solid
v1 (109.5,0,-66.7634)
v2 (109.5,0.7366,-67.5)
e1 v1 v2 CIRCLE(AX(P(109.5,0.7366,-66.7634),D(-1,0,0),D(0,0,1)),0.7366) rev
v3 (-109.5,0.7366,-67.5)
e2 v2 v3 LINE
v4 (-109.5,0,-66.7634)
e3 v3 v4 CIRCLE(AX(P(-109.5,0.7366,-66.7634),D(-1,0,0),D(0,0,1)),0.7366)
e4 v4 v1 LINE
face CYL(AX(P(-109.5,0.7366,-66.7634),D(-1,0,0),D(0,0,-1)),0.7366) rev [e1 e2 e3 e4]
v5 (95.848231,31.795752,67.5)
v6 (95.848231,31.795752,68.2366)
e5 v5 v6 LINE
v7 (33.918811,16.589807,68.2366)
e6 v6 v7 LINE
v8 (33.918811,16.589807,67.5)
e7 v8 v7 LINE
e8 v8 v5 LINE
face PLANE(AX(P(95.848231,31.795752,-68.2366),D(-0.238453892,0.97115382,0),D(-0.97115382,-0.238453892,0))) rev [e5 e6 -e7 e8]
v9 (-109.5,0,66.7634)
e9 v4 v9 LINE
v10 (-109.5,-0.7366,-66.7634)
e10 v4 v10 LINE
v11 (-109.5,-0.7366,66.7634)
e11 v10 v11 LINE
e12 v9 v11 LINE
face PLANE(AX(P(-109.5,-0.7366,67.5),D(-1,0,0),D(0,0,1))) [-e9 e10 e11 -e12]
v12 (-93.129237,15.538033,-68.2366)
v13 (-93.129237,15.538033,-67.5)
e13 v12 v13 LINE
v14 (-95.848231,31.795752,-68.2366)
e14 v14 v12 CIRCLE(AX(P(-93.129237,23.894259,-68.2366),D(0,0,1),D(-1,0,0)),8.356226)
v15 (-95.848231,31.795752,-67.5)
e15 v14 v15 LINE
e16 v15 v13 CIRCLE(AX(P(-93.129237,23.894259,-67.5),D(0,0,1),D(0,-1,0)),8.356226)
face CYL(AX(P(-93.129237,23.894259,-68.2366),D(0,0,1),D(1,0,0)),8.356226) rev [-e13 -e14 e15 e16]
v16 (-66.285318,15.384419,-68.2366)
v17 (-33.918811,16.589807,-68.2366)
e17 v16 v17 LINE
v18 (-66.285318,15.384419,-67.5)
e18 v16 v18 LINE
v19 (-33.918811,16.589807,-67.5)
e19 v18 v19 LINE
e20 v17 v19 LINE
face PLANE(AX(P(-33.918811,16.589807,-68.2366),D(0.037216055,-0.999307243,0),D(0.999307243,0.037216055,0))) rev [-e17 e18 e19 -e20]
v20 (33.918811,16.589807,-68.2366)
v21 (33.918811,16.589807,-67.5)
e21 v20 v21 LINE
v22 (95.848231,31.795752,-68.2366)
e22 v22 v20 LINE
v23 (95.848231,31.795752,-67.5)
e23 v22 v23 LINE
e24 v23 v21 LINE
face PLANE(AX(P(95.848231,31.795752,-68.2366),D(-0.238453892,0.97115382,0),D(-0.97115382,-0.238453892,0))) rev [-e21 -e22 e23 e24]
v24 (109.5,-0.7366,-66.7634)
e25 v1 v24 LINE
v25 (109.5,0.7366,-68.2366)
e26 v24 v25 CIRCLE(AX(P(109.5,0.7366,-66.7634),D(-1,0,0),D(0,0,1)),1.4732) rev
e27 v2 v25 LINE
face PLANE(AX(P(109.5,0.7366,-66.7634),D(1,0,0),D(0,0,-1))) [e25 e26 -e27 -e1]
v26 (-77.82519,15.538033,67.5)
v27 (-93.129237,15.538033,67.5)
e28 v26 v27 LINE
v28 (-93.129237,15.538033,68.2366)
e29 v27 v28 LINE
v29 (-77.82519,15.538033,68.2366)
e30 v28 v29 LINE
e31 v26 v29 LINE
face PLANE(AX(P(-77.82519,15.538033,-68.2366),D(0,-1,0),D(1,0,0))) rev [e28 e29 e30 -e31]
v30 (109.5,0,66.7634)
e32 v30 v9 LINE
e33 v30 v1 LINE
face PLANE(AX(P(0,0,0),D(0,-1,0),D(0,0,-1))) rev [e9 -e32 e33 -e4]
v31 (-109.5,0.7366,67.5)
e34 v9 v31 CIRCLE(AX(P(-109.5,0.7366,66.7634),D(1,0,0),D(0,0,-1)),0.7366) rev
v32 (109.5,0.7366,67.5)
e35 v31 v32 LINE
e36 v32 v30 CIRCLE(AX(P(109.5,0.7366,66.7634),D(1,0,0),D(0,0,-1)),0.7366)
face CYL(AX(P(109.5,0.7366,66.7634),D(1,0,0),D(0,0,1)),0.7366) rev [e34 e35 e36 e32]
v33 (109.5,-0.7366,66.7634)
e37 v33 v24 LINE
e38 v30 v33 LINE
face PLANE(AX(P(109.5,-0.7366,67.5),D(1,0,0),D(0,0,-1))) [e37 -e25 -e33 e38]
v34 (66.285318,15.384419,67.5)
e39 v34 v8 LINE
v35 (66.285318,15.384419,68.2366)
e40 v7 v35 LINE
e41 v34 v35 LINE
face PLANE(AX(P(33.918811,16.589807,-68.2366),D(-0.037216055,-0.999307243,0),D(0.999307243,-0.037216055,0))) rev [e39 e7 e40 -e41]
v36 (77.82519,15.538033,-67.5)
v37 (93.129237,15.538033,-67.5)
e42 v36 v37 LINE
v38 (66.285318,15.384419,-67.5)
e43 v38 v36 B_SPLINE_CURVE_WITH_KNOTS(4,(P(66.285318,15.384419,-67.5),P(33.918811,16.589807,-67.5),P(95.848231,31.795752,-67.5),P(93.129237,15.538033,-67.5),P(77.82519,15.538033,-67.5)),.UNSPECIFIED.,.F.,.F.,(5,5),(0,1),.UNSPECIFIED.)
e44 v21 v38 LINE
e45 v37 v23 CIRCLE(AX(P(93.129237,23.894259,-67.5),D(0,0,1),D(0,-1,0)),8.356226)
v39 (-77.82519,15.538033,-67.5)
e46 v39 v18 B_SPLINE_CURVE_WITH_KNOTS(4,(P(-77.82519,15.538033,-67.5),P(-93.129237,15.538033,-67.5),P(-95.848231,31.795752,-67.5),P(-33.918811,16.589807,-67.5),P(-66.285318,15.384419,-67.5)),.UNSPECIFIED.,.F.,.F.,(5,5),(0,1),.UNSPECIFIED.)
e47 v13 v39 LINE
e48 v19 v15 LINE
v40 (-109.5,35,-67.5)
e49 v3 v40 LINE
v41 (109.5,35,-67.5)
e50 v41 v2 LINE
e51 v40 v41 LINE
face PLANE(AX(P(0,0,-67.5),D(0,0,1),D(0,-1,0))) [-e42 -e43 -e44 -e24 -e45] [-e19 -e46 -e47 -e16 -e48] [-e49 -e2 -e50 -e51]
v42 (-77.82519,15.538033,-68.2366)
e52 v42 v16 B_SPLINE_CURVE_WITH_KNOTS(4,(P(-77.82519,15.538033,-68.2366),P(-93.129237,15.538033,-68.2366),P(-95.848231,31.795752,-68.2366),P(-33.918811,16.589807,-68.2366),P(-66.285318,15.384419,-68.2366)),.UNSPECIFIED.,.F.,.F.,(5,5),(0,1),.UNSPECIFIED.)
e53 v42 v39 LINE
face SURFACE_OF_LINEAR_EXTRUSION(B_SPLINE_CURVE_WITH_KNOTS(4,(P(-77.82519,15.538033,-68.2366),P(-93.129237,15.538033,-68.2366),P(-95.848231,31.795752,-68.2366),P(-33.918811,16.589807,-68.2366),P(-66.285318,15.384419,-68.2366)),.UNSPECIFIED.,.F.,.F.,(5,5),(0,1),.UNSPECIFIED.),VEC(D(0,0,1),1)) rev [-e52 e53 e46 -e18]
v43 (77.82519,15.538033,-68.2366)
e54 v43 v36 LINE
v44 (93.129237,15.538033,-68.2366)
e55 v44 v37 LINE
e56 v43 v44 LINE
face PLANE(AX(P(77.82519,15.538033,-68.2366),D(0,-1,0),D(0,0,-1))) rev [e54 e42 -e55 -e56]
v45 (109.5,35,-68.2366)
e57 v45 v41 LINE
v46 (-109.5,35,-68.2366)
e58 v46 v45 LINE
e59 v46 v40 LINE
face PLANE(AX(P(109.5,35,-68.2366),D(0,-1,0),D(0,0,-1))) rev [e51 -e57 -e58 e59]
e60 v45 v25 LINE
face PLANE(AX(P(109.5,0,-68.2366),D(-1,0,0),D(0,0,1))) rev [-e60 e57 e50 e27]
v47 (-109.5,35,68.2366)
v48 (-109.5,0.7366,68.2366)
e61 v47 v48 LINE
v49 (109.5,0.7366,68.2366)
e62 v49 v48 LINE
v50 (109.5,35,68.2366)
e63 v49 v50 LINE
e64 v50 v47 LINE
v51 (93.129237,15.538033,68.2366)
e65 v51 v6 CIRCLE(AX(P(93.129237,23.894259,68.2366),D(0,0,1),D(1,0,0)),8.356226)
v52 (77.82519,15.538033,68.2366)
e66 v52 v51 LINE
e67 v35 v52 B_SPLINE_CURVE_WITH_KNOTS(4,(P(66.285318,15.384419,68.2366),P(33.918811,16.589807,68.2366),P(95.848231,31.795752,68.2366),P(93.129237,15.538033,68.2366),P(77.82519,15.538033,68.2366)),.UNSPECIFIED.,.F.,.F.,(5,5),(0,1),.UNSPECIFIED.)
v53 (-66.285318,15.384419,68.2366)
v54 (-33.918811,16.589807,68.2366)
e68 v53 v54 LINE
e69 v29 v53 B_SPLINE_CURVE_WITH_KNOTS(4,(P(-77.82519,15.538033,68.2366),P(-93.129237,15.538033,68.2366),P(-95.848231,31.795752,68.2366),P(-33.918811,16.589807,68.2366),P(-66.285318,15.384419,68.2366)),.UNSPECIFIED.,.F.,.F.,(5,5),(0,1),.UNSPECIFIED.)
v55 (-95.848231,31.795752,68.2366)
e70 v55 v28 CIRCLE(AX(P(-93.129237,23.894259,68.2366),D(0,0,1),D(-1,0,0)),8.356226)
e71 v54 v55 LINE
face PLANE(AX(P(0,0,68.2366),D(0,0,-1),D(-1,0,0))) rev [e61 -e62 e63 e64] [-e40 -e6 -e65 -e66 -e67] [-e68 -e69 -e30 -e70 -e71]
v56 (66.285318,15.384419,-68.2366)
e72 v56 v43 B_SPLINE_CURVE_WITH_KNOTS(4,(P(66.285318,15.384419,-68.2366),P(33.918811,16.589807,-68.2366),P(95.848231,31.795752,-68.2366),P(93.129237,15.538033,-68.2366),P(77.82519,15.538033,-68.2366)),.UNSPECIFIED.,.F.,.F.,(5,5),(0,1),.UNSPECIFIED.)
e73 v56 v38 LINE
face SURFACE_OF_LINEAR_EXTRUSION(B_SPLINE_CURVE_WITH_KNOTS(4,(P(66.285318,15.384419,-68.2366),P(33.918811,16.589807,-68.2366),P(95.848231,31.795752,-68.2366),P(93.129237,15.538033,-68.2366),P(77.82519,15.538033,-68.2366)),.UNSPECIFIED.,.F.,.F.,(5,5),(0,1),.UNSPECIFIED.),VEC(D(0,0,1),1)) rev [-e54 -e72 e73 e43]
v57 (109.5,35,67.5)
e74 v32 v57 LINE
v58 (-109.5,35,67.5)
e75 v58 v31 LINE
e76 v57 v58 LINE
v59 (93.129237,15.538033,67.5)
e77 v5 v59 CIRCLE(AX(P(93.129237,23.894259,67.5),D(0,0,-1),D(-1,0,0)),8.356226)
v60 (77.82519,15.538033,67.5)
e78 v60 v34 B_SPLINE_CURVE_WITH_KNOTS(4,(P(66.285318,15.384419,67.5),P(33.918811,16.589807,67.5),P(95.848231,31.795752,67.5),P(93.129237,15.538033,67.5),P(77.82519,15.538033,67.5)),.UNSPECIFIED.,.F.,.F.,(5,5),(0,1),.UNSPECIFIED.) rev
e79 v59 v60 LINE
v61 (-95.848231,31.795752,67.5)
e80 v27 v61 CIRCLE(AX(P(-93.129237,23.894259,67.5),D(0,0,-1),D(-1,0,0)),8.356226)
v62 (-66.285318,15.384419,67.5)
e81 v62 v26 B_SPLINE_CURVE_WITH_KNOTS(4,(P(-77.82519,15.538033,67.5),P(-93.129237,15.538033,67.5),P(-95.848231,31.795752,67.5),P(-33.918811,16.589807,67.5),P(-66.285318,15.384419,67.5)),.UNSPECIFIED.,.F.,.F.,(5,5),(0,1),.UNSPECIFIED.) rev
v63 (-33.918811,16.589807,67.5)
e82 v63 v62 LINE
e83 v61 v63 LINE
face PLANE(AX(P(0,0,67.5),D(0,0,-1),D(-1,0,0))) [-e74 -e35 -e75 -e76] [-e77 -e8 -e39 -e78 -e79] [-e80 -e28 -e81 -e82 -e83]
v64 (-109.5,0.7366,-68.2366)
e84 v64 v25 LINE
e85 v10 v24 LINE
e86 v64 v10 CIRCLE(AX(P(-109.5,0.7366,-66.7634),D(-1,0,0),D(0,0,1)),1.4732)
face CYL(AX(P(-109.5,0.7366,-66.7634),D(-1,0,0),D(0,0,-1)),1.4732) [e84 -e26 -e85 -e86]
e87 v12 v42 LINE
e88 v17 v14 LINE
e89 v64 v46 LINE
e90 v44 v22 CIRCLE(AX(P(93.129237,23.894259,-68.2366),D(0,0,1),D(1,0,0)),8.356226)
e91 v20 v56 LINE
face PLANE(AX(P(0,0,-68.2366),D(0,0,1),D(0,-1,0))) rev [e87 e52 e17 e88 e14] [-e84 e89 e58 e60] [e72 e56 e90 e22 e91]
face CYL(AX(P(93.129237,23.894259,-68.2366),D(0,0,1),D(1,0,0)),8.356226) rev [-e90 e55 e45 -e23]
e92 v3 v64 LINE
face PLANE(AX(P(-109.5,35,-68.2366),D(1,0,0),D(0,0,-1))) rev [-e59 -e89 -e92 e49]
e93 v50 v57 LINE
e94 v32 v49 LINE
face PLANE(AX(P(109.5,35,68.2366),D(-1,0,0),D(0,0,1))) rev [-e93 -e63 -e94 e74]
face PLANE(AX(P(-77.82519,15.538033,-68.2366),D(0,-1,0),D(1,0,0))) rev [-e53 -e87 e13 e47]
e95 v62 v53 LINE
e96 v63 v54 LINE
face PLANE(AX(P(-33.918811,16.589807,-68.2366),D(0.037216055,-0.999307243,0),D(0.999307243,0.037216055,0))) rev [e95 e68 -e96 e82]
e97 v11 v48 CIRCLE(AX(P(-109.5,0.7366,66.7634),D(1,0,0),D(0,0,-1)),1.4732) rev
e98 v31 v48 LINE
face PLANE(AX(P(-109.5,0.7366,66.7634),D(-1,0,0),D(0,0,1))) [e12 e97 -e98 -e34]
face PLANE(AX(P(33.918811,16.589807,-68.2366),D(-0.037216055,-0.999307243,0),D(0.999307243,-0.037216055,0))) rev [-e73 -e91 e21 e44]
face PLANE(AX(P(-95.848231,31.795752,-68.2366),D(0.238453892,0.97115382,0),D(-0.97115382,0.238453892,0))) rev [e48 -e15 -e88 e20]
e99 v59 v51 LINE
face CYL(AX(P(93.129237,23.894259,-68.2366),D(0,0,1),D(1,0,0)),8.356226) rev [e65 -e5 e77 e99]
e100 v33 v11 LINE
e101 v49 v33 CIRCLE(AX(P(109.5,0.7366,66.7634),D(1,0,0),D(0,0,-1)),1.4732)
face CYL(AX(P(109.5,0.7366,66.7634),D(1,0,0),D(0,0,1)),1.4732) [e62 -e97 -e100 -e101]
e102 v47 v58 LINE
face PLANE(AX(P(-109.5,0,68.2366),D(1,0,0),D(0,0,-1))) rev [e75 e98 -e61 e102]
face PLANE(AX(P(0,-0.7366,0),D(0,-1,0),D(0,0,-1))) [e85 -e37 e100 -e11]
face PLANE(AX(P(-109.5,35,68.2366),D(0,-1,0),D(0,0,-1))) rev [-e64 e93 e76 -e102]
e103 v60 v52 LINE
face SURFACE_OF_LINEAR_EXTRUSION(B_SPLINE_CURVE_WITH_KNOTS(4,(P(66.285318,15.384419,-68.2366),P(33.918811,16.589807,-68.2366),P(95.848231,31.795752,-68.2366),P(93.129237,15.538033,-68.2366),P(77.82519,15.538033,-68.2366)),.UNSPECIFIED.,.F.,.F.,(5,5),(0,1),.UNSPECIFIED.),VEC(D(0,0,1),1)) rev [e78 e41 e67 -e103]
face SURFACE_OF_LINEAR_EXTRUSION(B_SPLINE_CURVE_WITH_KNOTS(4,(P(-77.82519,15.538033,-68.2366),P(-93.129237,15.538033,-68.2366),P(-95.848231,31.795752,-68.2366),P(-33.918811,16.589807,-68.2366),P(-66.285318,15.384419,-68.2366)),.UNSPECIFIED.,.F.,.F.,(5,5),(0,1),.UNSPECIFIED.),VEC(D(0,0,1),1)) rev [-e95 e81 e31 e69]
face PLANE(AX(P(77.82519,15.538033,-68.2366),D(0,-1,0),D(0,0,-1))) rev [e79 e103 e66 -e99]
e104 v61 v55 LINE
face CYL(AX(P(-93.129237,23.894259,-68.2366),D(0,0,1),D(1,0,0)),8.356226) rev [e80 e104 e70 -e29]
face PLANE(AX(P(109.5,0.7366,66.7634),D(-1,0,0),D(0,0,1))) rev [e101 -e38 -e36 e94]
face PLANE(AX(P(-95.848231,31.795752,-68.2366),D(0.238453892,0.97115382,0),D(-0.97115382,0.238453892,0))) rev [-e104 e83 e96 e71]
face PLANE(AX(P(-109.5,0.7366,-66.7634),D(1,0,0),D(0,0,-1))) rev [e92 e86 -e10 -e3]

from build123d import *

# Parameters (mm, degrees)
SKETCH1_W                      = 219
SKETCH1_H                      = 135
BASE_FLANGE1_DEPTH             = 0.7366
EDGE_FLANGE1_STRIP_W           = 4.4196
EDGE_FLANGE1_STRIP_H           = 0.7366
EDGE_FLANGE1_STRIP_CUT_DEPTH   = 219
EDGE_FLANGE1_STRIP_2_W         = 4.4196
EDGE_FLANGE1_STRIP_2_H         = 0.7366
EDGE_FLANGE1_STRIP_CUT_2_DEPTH = 219
EDGE_FLANGE1_DEPTH             = 219
EDGE_FLANGE1_BEND_DEPTH        = 219
CUT_EXTRUDE1_DEPTH             = 179.438180663


# Sheet-metal steps are written as plain solids
with BuildPart() as part:
    # Sketch1 → Base-Flange1 (new body)
    with BuildSketch(Plane(origin=(0, 0, 0), x_dir=(1, 0, 0), z_dir=(0, 1, 0))):
        Rectangle(SKETCH1_W, SKETCH1_H)
    extrude(amount=-BASE_FLANGE1_DEPTH)

    # Edge-Flange1 strip (across the edge) → Edge-Flange1 strip cut (cut)
    with BuildSketch(Plane(origin=(-109.5, 0, 67.5), x_dir=(0, 0, -1), z_dir=(1, 0, 0))):
        with Locations((-1.4732, -0.3683)):
            Rectangle(EDGE_FLANGE1_STRIP_W, EDGE_FLANGE1_STRIP_H)
    extrude(amount=EDGE_FLANGE1_STRIP_CUT_DEPTH, mode=Mode.SUBTRACT)

    # Edge-Flange1 strip 2 (across the edge) → Edge-Flange1 strip cut 2 (cut)
    with BuildSketch(Plane(origin=(109.5, 0, -67.5), x_dir=(0, 0, 1), z_dir=(-1, 0, 0))):
        with Locations((-1.4732, -0.3683)):
            Rectangle(EDGE_FLANGE1_STRIP_2_W, EDGE_FLANGE1_STRIP_2_H)
    extrude(amount=EDGE_FLANGE1_STRIP_CUT_2_DEPTH, mode=Mode.SUBTRACT)

    # Edge-Flange1 section (across the edge) → Edge-Flange1 (add)
    with BuildSketch(Plane(origin=(-109.5, 0, 67.5), x_dir=(0, 0, -1), z_dir=(1, 0, 0))):
        with BuildLine():
            Line((-0.7366, 0.7366), (-0.7366, 35))
            Line((-0.7366, 35), (0, 35))
            Line((0, 35), (0, 0.7366))
            ThreePointArc((0, 0.7366), (0.215745145, 0.215745145), (0.7366, 0))
            Line((0.7366, 0), (0.7366, -0.7366))
            ThreePointArc((0.7366, -0.7366), (-0.30510971, -0.30510971), (-0.7366, 0.7366))
        make_face()
    extrude(amount=EDGE_FLANGE1_DEPTH)

    # Edge-Flange1 section 2 (across the edge) → Edge-Flange1 bend (add)
    with BuildSketch(Plane(origin=(109.5, 0, -67.5), x_dir=(0, 0, 1), z_dir=(-1, 0, 0))):
        with BuildLine():
            Line((-0.7366, 0.7366), (-0.7366, 35))
            Line((-0.7366, 35), (0, 35))
            Line((0, 35), (0, 0.7366))
            ThreePointArc((0, 0.7366), (0.215745145, 0.215745145), (0.7366, 0))
            Line((0.7366, 0), (0.7366, -0.7366))
            ThreePointArc((0.7366, -0.7366), (-0.30510971, -0.30510971), (-0.7366, 0.7366))
        make_face()
    extrude(amount=EDGE_FLANGE1_BEND_DEPTH)

    # Sketch13 → Cut-Extrude1 (cut, through all)
    with BuildSketch(Plane.XY.offset(68.2366)):
        with BuildLine():
            Line((77.825189915, 15.538033098), (93.129236627, 15.538033098))
            ThreePointArc((93.129236627, 15.538033098), (101.370995393, 22.515880602), (95.848230578, 31.795751945))
            Line((95.848230578, 31.795751945), (33.918811085, 16.589807391))
            Line((33.918811085, 16.589807391), (66.285317903, 15.384418636))
            add(Edge.make_bspline(
                [(66.285317903, 15.384418636), (33.918811085, 16.589807391), (95.848230578, 31.795751945), (93.129236627, 15.538033098), (77.825189915, 15.538033098)],
                knots=[0, 0, 0, 0, 0, 1, 1, 1, 1, 1], degree=4))
        make_face()
        with BuildLine():
            Line((-95.848230578, 31.795751945), (-33.918811085, 16.589807391))
            Line((-33.918811085, 16.589807391), (-66.285317903, 15.384418636))
            add(Edge.make_bspline(
                [(-66.285317903, 15.384418636), (-33.918811085, 16.589807391), (-95.848230578, 31.795751945), (-93.129236627, 15.538033098), (-77.825189915, 15.538033098)],
                knots=[0, 0, 0, 0, 0, 1, 1, 1, 1, 1], degree=4))
            Line((-77.825189915, 15.538033098), (-93.129236627, 15.538033098))
            ThreePointArc((-93.129236627, 15.538033098), (-101.370995393, 22.515880602), (-95.848230578, 31.795751945))
        make_face()
    extrude(amount=-CUT_EXTRUDE1_DEPTH, mode=Mode.SUBTRACT)


solid = part.part
